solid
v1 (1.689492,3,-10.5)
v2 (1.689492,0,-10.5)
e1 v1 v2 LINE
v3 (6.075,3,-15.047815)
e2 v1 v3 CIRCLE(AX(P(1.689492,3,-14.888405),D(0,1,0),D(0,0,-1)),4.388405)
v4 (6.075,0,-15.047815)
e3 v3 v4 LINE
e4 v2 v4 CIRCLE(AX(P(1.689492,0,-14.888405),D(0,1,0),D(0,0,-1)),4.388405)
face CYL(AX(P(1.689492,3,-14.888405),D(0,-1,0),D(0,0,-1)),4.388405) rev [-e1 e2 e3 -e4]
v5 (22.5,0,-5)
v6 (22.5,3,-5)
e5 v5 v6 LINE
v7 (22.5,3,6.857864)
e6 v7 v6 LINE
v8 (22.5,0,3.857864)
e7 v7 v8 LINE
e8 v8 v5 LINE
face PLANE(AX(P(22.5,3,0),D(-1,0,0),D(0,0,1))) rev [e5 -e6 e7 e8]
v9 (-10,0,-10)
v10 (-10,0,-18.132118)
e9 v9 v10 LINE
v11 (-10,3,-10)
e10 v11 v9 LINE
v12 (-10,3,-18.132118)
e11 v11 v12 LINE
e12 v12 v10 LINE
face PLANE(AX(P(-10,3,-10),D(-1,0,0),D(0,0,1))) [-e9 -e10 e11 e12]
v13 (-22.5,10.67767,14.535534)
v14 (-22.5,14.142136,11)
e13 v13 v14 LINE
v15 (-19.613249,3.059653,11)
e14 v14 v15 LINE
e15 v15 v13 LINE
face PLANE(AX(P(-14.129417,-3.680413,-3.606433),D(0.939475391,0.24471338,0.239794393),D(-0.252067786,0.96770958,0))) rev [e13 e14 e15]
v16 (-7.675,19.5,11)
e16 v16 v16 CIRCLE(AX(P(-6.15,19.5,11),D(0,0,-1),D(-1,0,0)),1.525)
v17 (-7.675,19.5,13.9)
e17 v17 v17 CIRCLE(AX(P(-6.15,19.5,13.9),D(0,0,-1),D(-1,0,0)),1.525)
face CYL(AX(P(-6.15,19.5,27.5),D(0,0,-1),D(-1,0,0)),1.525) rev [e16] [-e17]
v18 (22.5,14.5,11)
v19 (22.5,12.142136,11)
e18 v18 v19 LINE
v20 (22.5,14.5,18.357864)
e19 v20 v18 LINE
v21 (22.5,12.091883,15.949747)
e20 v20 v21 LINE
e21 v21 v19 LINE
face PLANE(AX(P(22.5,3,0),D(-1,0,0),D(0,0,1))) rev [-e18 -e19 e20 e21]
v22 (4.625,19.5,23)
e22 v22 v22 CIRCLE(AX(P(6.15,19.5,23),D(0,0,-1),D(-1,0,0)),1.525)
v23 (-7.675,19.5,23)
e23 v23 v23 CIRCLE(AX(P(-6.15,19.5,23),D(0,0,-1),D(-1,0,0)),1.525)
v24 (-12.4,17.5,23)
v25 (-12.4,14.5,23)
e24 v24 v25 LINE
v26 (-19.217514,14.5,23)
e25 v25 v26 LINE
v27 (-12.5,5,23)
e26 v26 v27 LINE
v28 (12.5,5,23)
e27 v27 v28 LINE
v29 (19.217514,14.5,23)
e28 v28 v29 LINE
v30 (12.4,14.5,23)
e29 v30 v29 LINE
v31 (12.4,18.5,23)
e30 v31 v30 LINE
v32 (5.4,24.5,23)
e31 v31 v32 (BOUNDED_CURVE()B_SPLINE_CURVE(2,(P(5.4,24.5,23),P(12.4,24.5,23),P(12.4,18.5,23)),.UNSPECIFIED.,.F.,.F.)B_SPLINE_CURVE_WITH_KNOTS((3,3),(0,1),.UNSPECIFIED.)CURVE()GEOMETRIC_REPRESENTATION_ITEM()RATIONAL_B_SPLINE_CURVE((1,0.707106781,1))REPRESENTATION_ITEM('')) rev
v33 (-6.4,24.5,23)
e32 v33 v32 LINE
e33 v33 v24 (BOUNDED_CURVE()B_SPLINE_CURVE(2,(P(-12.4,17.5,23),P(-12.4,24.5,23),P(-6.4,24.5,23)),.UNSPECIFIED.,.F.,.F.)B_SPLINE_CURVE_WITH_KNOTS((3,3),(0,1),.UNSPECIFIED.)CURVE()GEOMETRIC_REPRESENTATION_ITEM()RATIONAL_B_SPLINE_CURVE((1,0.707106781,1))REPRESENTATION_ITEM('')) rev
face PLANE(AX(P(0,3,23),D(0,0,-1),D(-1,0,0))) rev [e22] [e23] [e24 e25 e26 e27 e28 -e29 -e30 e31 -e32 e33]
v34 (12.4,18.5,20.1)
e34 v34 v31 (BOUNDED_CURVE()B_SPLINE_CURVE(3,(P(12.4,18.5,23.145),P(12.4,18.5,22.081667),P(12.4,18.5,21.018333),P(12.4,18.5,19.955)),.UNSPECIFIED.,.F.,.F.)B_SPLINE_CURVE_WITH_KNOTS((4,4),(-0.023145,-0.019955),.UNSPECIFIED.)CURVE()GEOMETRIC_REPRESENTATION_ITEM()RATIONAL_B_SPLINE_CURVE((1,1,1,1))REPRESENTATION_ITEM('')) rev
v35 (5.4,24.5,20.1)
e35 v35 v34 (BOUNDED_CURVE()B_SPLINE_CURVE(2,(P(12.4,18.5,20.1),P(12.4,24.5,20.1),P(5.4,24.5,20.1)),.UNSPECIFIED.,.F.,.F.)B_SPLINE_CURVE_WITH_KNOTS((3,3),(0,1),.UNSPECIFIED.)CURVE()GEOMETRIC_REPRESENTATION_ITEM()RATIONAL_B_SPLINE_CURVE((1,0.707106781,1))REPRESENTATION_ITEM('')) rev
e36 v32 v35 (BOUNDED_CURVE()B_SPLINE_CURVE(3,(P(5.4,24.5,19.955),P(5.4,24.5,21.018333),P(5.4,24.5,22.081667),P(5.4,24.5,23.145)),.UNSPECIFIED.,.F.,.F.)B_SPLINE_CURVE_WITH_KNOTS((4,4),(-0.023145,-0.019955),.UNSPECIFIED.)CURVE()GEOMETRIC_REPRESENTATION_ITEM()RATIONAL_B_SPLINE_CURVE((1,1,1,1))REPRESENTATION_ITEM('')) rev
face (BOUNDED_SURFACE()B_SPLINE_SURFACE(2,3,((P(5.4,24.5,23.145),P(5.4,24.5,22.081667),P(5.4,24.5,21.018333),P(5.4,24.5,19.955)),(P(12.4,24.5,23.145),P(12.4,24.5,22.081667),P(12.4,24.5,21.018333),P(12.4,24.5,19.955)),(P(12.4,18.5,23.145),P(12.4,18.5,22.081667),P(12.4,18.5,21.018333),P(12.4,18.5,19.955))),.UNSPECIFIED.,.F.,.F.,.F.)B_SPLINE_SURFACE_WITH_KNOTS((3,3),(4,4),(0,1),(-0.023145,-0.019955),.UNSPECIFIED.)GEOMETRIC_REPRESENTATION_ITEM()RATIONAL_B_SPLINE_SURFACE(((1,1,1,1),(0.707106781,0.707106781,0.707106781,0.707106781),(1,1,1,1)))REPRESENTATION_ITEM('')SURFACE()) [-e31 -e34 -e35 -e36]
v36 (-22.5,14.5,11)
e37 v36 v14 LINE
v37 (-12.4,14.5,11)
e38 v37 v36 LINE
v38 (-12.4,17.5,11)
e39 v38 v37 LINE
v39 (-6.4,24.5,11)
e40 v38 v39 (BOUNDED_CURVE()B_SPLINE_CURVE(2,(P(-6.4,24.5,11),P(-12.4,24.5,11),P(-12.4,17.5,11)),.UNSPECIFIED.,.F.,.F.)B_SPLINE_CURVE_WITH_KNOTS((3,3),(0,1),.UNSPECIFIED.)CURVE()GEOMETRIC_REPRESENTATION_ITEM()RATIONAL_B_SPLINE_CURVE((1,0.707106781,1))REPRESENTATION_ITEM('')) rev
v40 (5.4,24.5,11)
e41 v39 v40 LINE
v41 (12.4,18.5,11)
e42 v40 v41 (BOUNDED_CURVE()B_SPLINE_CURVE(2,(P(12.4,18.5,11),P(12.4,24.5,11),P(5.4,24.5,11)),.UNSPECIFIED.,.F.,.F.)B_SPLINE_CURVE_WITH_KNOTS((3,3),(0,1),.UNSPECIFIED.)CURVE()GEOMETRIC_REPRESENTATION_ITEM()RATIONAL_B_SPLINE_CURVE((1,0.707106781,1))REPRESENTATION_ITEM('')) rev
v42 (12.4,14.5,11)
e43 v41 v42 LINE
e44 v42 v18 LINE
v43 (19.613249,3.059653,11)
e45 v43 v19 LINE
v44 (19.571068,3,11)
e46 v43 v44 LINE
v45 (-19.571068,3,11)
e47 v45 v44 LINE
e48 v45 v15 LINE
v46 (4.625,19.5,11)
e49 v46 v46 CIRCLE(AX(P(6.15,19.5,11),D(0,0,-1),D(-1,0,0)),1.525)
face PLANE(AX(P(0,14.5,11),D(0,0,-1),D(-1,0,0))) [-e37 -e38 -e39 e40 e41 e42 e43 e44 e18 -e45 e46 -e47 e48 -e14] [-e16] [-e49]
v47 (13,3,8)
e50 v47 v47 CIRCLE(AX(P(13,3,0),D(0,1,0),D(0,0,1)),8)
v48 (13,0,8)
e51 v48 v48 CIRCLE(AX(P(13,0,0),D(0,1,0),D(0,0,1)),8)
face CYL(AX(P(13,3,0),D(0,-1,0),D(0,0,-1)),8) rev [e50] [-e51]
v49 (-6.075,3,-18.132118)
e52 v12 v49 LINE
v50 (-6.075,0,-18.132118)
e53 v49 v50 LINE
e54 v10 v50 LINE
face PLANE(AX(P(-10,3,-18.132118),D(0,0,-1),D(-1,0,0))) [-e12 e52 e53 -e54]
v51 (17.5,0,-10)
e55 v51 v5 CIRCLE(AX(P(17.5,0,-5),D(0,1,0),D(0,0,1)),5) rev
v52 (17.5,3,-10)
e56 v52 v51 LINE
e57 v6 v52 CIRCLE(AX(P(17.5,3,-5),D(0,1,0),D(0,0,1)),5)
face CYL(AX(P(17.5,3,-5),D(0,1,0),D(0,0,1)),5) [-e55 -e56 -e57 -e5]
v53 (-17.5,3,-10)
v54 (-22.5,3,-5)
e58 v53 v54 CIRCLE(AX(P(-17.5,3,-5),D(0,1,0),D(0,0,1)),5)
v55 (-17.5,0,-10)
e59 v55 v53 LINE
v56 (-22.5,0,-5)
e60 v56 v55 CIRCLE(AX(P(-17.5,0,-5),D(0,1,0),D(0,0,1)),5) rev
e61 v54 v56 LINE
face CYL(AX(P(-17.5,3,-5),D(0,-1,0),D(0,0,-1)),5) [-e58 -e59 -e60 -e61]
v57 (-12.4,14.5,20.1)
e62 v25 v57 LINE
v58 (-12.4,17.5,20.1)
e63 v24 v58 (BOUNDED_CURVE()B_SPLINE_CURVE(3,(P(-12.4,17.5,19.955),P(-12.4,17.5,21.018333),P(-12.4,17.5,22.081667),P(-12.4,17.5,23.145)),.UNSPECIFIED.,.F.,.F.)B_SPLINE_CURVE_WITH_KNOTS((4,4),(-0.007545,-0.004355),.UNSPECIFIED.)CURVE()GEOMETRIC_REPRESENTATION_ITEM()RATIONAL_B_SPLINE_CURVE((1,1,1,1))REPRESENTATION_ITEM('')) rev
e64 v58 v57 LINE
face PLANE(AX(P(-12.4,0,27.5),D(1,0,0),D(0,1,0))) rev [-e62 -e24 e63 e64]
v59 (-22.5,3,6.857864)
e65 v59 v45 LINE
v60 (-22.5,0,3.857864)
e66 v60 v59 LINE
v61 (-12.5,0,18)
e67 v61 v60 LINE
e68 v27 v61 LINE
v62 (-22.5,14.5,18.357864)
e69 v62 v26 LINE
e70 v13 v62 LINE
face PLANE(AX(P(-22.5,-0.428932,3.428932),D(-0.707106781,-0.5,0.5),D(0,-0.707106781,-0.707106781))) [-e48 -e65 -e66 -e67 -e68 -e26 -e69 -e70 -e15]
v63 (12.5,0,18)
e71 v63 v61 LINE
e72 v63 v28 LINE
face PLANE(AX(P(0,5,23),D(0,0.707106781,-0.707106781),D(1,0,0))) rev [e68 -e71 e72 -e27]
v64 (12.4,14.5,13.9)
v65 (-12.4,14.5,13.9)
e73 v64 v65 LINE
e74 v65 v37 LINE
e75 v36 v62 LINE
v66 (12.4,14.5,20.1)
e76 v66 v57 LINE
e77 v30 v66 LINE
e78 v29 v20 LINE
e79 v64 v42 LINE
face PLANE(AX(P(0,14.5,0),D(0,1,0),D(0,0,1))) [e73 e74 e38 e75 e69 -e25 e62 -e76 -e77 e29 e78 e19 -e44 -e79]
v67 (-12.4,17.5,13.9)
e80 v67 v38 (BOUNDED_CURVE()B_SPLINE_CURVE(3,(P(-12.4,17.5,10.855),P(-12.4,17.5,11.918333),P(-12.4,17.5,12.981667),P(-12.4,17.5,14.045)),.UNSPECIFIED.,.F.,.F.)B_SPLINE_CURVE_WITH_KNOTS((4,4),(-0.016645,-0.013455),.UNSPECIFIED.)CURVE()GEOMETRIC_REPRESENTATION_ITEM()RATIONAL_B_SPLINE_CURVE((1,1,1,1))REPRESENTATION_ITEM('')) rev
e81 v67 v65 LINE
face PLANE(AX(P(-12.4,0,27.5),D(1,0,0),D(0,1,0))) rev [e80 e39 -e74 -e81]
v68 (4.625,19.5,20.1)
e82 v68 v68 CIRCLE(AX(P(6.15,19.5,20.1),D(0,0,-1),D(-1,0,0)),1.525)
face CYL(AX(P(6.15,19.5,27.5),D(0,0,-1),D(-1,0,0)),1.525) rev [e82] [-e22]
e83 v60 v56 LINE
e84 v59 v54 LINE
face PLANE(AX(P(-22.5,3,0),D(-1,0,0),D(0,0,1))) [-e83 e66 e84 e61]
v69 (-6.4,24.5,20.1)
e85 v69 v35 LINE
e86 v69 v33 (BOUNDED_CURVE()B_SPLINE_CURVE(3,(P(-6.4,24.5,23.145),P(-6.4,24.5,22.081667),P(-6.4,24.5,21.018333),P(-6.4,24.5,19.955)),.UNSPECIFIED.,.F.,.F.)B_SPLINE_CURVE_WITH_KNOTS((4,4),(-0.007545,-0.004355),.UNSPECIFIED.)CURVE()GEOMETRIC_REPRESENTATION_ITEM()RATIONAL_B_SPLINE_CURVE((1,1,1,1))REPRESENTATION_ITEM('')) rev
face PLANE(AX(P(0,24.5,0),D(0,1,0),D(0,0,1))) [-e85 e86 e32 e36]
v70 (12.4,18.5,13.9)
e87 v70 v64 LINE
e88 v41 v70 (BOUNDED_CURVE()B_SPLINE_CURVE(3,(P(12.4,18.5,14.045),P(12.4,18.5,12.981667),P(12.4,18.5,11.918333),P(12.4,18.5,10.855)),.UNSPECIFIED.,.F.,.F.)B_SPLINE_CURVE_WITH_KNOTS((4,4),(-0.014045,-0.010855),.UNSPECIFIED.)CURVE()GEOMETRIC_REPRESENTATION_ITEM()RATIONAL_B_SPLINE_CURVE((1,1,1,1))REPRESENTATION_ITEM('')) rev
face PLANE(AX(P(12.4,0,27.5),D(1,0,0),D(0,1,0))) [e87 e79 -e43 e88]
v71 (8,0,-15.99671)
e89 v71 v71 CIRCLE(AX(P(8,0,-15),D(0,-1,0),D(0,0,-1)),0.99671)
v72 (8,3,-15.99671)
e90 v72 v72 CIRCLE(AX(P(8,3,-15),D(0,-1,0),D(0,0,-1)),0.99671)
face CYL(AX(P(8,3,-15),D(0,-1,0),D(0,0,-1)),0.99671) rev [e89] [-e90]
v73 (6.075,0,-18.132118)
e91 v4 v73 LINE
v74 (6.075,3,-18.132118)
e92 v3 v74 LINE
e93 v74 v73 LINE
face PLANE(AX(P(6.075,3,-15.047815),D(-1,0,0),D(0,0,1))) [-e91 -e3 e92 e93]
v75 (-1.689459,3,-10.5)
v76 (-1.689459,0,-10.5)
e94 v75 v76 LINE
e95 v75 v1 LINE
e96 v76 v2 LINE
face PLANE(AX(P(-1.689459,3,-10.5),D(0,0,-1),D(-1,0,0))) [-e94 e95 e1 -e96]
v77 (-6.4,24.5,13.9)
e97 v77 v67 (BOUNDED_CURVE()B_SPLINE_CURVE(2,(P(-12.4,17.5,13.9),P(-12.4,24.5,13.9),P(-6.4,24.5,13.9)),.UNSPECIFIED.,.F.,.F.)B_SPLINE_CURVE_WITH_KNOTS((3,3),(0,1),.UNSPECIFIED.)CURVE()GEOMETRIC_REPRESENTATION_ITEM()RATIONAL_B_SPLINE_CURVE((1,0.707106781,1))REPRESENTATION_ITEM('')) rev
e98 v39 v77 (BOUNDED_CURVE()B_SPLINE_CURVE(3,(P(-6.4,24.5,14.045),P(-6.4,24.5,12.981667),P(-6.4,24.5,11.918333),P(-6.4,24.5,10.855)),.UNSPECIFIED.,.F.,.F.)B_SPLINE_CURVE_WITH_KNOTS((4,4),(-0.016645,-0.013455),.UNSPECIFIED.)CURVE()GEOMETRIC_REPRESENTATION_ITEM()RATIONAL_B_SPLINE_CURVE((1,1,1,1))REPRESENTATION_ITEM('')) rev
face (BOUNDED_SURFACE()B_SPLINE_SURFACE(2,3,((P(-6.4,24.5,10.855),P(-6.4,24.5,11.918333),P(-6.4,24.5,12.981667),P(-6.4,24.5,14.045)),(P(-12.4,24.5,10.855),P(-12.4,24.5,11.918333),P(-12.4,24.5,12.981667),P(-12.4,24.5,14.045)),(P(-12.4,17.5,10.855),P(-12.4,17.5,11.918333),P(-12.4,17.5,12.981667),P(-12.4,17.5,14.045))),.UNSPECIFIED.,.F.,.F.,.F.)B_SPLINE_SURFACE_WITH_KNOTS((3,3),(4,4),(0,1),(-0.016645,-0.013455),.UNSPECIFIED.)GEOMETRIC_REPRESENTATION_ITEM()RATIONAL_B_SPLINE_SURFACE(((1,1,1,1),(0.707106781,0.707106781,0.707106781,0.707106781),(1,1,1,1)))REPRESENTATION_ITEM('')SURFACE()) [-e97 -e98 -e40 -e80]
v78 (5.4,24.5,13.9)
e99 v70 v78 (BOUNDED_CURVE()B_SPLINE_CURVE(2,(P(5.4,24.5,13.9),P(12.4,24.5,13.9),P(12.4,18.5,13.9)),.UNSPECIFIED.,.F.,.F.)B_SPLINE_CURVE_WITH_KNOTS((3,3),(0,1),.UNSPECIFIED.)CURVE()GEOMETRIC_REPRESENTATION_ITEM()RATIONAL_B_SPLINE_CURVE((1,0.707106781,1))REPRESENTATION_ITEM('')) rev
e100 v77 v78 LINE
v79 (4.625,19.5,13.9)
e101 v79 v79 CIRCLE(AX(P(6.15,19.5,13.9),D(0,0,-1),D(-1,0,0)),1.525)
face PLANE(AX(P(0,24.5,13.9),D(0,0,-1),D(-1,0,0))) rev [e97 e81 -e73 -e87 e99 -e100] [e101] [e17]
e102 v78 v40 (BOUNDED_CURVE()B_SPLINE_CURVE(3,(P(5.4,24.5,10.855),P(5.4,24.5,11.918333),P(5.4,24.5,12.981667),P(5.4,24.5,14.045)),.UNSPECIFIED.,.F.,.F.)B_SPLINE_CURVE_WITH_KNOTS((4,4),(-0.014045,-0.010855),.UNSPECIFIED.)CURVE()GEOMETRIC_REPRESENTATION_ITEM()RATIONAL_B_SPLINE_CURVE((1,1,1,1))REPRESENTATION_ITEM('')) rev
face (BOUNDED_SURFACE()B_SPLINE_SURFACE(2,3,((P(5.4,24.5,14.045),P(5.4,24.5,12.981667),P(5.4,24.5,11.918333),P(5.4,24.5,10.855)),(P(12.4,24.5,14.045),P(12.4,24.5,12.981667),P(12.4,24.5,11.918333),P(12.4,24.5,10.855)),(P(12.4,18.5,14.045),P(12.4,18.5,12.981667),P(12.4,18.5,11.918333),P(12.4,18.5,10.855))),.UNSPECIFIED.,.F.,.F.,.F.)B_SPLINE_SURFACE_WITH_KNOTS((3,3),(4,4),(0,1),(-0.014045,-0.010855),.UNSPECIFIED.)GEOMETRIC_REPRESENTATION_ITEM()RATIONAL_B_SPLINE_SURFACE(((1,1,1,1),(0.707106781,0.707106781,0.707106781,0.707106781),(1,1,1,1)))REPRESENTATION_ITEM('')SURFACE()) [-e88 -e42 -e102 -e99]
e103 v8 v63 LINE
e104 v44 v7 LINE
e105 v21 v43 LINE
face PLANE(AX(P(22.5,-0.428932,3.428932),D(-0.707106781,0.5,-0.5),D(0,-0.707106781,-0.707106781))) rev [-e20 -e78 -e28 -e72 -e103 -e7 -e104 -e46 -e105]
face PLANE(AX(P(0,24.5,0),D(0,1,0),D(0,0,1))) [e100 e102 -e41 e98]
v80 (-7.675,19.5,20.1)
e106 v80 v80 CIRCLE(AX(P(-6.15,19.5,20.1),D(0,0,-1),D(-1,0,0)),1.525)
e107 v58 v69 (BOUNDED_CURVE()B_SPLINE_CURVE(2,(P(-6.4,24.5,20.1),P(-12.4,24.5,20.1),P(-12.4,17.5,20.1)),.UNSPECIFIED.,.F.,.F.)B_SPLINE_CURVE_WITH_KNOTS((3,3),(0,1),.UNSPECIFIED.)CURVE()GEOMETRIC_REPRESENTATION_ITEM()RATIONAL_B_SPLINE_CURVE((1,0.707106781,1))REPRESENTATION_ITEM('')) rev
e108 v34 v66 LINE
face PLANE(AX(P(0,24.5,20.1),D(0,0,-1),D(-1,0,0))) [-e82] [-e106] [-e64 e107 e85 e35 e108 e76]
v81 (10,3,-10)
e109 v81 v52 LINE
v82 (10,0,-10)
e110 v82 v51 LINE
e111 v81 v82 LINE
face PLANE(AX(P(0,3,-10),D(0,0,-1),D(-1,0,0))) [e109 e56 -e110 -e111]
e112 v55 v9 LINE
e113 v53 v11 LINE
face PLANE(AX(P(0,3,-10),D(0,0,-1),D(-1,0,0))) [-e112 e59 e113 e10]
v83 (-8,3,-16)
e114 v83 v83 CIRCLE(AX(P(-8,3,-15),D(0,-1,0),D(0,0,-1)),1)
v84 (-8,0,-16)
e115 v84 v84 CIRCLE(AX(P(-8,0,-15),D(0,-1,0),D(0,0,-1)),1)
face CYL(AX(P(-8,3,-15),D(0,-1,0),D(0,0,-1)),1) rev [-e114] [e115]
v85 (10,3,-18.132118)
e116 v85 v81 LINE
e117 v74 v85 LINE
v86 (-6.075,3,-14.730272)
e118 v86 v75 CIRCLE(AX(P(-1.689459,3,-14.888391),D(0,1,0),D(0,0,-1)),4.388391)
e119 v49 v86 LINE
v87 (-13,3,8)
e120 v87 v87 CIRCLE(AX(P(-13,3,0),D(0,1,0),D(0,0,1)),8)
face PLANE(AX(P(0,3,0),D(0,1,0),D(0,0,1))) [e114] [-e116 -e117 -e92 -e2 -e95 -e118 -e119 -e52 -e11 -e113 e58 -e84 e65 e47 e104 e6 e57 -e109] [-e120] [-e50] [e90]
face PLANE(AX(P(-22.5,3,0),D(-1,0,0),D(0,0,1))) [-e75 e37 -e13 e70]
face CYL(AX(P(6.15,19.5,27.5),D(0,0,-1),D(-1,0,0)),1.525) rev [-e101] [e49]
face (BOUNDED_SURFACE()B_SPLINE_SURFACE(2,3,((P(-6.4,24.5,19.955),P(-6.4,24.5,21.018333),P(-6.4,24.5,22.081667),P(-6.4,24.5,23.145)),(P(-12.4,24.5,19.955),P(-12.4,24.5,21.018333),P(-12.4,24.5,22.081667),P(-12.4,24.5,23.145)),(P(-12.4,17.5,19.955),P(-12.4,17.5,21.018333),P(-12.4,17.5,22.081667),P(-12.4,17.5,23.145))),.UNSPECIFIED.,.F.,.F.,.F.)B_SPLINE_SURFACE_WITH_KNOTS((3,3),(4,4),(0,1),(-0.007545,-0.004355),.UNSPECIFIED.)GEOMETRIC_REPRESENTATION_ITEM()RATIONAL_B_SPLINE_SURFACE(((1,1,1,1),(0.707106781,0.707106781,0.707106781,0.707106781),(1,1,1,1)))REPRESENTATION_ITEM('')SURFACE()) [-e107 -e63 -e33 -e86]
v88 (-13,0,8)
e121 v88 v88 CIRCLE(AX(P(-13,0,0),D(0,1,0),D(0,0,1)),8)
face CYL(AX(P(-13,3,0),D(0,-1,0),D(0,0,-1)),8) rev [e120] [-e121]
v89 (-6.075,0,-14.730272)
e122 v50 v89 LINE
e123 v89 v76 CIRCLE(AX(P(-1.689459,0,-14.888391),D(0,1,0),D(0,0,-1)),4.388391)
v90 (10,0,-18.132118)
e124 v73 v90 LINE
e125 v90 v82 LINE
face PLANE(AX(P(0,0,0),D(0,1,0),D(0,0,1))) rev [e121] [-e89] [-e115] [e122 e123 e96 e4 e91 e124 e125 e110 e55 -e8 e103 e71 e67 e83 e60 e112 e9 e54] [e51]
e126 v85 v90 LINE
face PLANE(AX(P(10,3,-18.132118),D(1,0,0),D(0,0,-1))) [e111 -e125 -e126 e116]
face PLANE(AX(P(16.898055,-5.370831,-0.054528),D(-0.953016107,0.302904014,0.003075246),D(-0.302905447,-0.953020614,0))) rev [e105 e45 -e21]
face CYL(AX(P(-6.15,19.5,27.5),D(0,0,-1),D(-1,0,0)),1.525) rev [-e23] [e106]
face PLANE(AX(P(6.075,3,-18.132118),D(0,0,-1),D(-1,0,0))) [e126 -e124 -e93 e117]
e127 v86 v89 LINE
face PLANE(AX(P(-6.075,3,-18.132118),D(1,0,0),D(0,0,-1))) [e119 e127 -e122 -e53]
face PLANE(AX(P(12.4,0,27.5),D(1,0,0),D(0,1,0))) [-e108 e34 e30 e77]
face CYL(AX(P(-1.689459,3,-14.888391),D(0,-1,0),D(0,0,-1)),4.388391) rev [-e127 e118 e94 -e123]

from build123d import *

# Parameters (mm, degrees)
SKETCH1_W           = 45
SKETCH1_H           = 20
SKETCH1_R           = 8
SKETCH1_H_2         = 13
SKETCH1_H_3         = 1
BOSS_EXTRUDE1_DEPTH = 3
SKETCH3_W           = 45
SKETCH3_H           = 2.9
SKETCH3_H_2         = 6.2
BOSS_EXTRUDE2_DEPTH = 11.5
SKETCH3_3_W         = 45
SKETCH3_3_H         = 2.9
BOSS_EXTRUDE3_DEPTH = 21.5
SKETCH6_R           = 1.525
SKETCH6_W           = 10.1
SKETCH6_H           = 10
CUT_EXTRUDE2_DEPTH  = 16.5
CHAMFER1_SIZE       = 5
FILLET2_R           = 5
FILLET3_SIZE        = 7
FILLET3_SIZE_2      = 6
SKETCH7_R           = 0.996709825
SKETCH7_R_2         = 1
BOSS_EXTRUDE4_DEPTH = 3
CHAMFER2_SIZE       = 10
CHAMFER3_SIZE       = 10
CHAMFER4_START      = 17.731133084
CHAMFER4_DEPTH      = 3.699865449
CHAMFER5_START      = -16.752681828
CHAMFER5_DEPTH      = 1.71299366


with BuildPart() as part:
    # Sketch1 → Boss-Extrude1 (new body)
    # profile 1 of 3: a face of its own
    with BuildSketch(Plane(origin=(0, 0, 0), x_dir=(1, 0, 0), z_dir=(0, 1, 0))):
        Rectangle(SKETCH1_W, SKETCH1_H)
        with Locations(Location((13, 0, 0), (0, 0, 270))):
            Circle(SKETCH1_R, mode=Mode.SUBTRACT)
        with Locations(Location((-13, 0, 0), (0, 0, 270))):
            Circle(SKETCH1_R, mode=Mode.SUBTRACT)
    # profile 2 of 3: a face of its own
    with BuildSketch(Plane(origin=(0, 0, 0), x_dir=(1, 0, 0), z_dir=(0, 1, 0))):
        with Locations((0, -16.5)):
            Rectangle(SKETCH1_W, SKETCH1_H_2)
    # profile 3 of 3: a face of its own
    with BuildSketch(Plane(origin=(0, 0, 0), x_dir=(1, 0, 0), z_dir=(0, 1, 0))):
        with Locations((0, -10.5)):
            Rectangle(SKETCH1_W, SKETCH1_H_3)
    extrude(amount=BOSS_EXTRUDE1_DEPTH)

    # Sketch3 → Boss-Extrude2 (add)
    with BuildSketch(Plane(origin=(0, 3, 0), x_dir=(1, 0, 0), z_dir=(0, 1, 0))):
        with Locations((0, -21.55)):
            Rectangle(SKETCH3_W, SKETCH3_H)
        with Locations((0, -17)):
            Rectangle(SKETCH3_W, SKETCH3_H_2)
        with Locations((0, -12.45)):
            Rectangle(SKETCH3_W, SKETCH3_H)
    extrude(amount=BOSS_EXTRUDE2_DEPTH)

    # Sketch3<3> → Boss-Extrude3 (add)
    with BuildSketch(Plane(origin=(0, 3, 0), x_dir=(1, 0, 0), z_dir=(0, 1, 0))):
        with Locations((0, -12.45)):
            Rectangle(SKETCH3_3_W, SKETCH3_3_H)
        with Locations((0, -21.55)):
            Rectangle(SKETCH3_3_W, SKETCH3_3_H)
    extrude(amount=BOSS_EXTRUDE3_DEPTH)

    # Sketch6 → Cut-Extrude2 (cut)
    with BuildSketch(Plane(origin=(0, 0, 11), x_dir=(-1, 0, 0), z_dir=(0, 0, -1))):
        with Locations((-6.15, 19.5)):
            Circle(SKETCH6_R)
        with Locations((6.15, 19.5)):
            Circle(SKETCH6_R)
        with Locations((-17.45, 19.5)):
            Rectangle(SKETCH6_W, SKETCH6_H)
        with Locations((17.45, 19.5)):
            Rectangle(SKETCH6_W, SKETCH6_H)
    extrude(amount=-CUT_EXTRUDE2_DEPTH, mode=Mode.SUBTRACT)

    # Chamfer1
    chamfer1_edges = [part.edges().sort_by_distance(p)[0] for p in [
        (0, 0, 23),
    ]]
    chamfer(chamfer1_edges, length=CHAMFER1_SIZE)

    # Fillet2
    fillet2_edges = [part.edges().sort_by_distance(p)[0] for p in [
        (-22.5, 1.5, -10),
        (22.5, 1.5, -10),
    ]]
    fillet(fillet2_edges, radius=FILLET2_R)

    # Fillet3
    # a fillet whose section is not a circle: 7, 6 mm, written as the material it takes off along each edge
    with BuildSketch(Plane(origin=(12.4, 24.5, -6.5), x_dir=(-1, 0, 0), z_dir=(0, 0, 1)), Plane(origin=(-12.4, 24.5, -6.5), x_dir=(0, -1, 0), z_dir=(0, 0, 1))) as fillet3_piece_1:
        with BuildLine():
            Bezier((FILLET3_SIZE, 0), (0, 0), (0, FILLET3_SIZE_2), weights=[1, 0.707106781, 1])
            Line((0, FILLET3_SIZE_2), (0, 0))
            Line((0, 0), (FILLET3_SIZE, 0))
        make_face()
    extrude(amount=37.9, mode=Mode.SUBTRACT)
    with BuildSketch(Plane(origin=(12.4, 24.5, 2.6), x_dir=(0, -1, 0), z_dir=(0, 0, 1)), Plane(origin=(-12.4, 24.5, 2.6), x_dir=(1, 0, 0), z_dir=(0, 0, 1))) as fillet3_piece_2:
        with BuildLine():
            Bezier((FILLET3_SIZE_2, 0), (0, 0), (0, -FILLET3_SIZE), weights=[1, 0.707106781, 1])
            Line((0, -FILLET3_SIZE), (0, 0))
            Line((0, 0), (FILLET3_SIZE_2, 0))
        make_face()
    extrude(amount=37.9, mode=Mode.SUBTRACT)

    # Sketch7 → Boss-Extrude4 (add)
    with BuildSketch(Plane.XZ):
        with BuildLine():
            Line((-10, -10), (10, -10))
            Line((10, -10), (10, -18.132118098))
            Line((10, -18.132118098), (6.075, -18.132118098))
            Line((6.075, -18.132118098), (6.075, -15.047815402))
            ThreePointArc((6.075, -15.047815402), (4.848419821, -11.842215517), (1.689491671, -10.5))
            Line((1.689491671, -10.5), (-1.689458819, -10.5))
            ThreePointArc((-1.689458819, -10.5), (-4.736103523, -11.729921298), (-6.075, -14.730272374))
            Line((-6.075, -14.730272374), (-6.075, -18.132118098))
            Line((-6.075, -18.132118098), (-10, -18.132118098))
            Line((-10, -18.132118098), (-10, -10))
        make_face()
        with Locations(Location((8, -15, 0), (0, 0, 270))):
            Circle(SKETCH7_R, mode=Mode.SUBTRACT)
        with Locations(Location((-8, -15, 0), (0, 0, 270))):
            Circle(SKETCH7_R_2, mode=Mode.SUBTRACT)
    extrude(amount=-BOSS_EXTRUDE4_DEPTH)

    # Chamfer2
    # the kernel refuses this chamfer: 10 mm, written as the material it takes off along each edge
    with BuildSketch(Plane(origin=(22.5, 23.184544799, 41.184544799), x_dir=(0, 0.7071067811865476, -0.7071067811865476), z_dir=(0, -0.7071067811865476, -0.7071067811865476))) as chamfer2_piece_1:
        Polygon((CHAMFER2_SIZE, 0), (0, -CHAMFER2_SIZE), (0, 0), align=None)
    extrude(amount=58.504727571, mode=Mode.SUBTRACT)

    # Chamfer3
    # the kernel refuses this chamfer: 10 mm, written as the material it takes off along each edge
    with BuildSketch(Plane(origin=(-22.5, 23.184544799, 41.184544799), x_dir=(1, 0, 0), z_dir=(0, -0.7071067811865476, -0.7071067811865476))) as chamfer3_piece_1:
        Polygon((CHAMFER3_SIZE, 0), (0, -CHAMFER3_SIZE), (0, 0), align=None)
    extrude(amount=58.504727571, mode=Mode.SUBTRACT)

    # Chamfer4: read off the stored shape, not the designer's step
    # Chamfer4 outline → Chamfer4 (cut)
    with BuildSketch(Plane(origin=(0, 0, 0), x_dir=(0.3029024372169638, 0.9530210691127028, -0.0009774227869083028), z_dir=(0.9530161074355918, -0.302904014214538, -0.0030752464993570898)).offset(CHAMFER4_START)):
        Polygon((8.846062674, 11.063231546), (18.37626426, 11.072546631), (18.323534543, 16.02226833), align=None)
    extrude(amount=CHAMFER4_DEPTH, mode=Mode.SUBTRACT)

    # Chamfer5: read off the stored shape, not the designer's step
    # Chamfer5 outline → Chamfer5 (cut)
    with BuildSketch(Plane(origin=(0, 0, 0), x_dir=(-0.2371114626358165, 0.9695954628947141, -0.06052100974611115), z_dir=(0.9394753911891737, 0.24471337996518516, 0.2397943932121102)).offset(CHAMFER5_START)):
        Polygon((18.381427339, 16.222851439), (14.80832265, 19.648555484), (6.951420363, 15.508917831), align=None)
    extrude(amount=CHAMFER5_DEPTH, mode=Mode.SUBTRACT)


solid = part.part
